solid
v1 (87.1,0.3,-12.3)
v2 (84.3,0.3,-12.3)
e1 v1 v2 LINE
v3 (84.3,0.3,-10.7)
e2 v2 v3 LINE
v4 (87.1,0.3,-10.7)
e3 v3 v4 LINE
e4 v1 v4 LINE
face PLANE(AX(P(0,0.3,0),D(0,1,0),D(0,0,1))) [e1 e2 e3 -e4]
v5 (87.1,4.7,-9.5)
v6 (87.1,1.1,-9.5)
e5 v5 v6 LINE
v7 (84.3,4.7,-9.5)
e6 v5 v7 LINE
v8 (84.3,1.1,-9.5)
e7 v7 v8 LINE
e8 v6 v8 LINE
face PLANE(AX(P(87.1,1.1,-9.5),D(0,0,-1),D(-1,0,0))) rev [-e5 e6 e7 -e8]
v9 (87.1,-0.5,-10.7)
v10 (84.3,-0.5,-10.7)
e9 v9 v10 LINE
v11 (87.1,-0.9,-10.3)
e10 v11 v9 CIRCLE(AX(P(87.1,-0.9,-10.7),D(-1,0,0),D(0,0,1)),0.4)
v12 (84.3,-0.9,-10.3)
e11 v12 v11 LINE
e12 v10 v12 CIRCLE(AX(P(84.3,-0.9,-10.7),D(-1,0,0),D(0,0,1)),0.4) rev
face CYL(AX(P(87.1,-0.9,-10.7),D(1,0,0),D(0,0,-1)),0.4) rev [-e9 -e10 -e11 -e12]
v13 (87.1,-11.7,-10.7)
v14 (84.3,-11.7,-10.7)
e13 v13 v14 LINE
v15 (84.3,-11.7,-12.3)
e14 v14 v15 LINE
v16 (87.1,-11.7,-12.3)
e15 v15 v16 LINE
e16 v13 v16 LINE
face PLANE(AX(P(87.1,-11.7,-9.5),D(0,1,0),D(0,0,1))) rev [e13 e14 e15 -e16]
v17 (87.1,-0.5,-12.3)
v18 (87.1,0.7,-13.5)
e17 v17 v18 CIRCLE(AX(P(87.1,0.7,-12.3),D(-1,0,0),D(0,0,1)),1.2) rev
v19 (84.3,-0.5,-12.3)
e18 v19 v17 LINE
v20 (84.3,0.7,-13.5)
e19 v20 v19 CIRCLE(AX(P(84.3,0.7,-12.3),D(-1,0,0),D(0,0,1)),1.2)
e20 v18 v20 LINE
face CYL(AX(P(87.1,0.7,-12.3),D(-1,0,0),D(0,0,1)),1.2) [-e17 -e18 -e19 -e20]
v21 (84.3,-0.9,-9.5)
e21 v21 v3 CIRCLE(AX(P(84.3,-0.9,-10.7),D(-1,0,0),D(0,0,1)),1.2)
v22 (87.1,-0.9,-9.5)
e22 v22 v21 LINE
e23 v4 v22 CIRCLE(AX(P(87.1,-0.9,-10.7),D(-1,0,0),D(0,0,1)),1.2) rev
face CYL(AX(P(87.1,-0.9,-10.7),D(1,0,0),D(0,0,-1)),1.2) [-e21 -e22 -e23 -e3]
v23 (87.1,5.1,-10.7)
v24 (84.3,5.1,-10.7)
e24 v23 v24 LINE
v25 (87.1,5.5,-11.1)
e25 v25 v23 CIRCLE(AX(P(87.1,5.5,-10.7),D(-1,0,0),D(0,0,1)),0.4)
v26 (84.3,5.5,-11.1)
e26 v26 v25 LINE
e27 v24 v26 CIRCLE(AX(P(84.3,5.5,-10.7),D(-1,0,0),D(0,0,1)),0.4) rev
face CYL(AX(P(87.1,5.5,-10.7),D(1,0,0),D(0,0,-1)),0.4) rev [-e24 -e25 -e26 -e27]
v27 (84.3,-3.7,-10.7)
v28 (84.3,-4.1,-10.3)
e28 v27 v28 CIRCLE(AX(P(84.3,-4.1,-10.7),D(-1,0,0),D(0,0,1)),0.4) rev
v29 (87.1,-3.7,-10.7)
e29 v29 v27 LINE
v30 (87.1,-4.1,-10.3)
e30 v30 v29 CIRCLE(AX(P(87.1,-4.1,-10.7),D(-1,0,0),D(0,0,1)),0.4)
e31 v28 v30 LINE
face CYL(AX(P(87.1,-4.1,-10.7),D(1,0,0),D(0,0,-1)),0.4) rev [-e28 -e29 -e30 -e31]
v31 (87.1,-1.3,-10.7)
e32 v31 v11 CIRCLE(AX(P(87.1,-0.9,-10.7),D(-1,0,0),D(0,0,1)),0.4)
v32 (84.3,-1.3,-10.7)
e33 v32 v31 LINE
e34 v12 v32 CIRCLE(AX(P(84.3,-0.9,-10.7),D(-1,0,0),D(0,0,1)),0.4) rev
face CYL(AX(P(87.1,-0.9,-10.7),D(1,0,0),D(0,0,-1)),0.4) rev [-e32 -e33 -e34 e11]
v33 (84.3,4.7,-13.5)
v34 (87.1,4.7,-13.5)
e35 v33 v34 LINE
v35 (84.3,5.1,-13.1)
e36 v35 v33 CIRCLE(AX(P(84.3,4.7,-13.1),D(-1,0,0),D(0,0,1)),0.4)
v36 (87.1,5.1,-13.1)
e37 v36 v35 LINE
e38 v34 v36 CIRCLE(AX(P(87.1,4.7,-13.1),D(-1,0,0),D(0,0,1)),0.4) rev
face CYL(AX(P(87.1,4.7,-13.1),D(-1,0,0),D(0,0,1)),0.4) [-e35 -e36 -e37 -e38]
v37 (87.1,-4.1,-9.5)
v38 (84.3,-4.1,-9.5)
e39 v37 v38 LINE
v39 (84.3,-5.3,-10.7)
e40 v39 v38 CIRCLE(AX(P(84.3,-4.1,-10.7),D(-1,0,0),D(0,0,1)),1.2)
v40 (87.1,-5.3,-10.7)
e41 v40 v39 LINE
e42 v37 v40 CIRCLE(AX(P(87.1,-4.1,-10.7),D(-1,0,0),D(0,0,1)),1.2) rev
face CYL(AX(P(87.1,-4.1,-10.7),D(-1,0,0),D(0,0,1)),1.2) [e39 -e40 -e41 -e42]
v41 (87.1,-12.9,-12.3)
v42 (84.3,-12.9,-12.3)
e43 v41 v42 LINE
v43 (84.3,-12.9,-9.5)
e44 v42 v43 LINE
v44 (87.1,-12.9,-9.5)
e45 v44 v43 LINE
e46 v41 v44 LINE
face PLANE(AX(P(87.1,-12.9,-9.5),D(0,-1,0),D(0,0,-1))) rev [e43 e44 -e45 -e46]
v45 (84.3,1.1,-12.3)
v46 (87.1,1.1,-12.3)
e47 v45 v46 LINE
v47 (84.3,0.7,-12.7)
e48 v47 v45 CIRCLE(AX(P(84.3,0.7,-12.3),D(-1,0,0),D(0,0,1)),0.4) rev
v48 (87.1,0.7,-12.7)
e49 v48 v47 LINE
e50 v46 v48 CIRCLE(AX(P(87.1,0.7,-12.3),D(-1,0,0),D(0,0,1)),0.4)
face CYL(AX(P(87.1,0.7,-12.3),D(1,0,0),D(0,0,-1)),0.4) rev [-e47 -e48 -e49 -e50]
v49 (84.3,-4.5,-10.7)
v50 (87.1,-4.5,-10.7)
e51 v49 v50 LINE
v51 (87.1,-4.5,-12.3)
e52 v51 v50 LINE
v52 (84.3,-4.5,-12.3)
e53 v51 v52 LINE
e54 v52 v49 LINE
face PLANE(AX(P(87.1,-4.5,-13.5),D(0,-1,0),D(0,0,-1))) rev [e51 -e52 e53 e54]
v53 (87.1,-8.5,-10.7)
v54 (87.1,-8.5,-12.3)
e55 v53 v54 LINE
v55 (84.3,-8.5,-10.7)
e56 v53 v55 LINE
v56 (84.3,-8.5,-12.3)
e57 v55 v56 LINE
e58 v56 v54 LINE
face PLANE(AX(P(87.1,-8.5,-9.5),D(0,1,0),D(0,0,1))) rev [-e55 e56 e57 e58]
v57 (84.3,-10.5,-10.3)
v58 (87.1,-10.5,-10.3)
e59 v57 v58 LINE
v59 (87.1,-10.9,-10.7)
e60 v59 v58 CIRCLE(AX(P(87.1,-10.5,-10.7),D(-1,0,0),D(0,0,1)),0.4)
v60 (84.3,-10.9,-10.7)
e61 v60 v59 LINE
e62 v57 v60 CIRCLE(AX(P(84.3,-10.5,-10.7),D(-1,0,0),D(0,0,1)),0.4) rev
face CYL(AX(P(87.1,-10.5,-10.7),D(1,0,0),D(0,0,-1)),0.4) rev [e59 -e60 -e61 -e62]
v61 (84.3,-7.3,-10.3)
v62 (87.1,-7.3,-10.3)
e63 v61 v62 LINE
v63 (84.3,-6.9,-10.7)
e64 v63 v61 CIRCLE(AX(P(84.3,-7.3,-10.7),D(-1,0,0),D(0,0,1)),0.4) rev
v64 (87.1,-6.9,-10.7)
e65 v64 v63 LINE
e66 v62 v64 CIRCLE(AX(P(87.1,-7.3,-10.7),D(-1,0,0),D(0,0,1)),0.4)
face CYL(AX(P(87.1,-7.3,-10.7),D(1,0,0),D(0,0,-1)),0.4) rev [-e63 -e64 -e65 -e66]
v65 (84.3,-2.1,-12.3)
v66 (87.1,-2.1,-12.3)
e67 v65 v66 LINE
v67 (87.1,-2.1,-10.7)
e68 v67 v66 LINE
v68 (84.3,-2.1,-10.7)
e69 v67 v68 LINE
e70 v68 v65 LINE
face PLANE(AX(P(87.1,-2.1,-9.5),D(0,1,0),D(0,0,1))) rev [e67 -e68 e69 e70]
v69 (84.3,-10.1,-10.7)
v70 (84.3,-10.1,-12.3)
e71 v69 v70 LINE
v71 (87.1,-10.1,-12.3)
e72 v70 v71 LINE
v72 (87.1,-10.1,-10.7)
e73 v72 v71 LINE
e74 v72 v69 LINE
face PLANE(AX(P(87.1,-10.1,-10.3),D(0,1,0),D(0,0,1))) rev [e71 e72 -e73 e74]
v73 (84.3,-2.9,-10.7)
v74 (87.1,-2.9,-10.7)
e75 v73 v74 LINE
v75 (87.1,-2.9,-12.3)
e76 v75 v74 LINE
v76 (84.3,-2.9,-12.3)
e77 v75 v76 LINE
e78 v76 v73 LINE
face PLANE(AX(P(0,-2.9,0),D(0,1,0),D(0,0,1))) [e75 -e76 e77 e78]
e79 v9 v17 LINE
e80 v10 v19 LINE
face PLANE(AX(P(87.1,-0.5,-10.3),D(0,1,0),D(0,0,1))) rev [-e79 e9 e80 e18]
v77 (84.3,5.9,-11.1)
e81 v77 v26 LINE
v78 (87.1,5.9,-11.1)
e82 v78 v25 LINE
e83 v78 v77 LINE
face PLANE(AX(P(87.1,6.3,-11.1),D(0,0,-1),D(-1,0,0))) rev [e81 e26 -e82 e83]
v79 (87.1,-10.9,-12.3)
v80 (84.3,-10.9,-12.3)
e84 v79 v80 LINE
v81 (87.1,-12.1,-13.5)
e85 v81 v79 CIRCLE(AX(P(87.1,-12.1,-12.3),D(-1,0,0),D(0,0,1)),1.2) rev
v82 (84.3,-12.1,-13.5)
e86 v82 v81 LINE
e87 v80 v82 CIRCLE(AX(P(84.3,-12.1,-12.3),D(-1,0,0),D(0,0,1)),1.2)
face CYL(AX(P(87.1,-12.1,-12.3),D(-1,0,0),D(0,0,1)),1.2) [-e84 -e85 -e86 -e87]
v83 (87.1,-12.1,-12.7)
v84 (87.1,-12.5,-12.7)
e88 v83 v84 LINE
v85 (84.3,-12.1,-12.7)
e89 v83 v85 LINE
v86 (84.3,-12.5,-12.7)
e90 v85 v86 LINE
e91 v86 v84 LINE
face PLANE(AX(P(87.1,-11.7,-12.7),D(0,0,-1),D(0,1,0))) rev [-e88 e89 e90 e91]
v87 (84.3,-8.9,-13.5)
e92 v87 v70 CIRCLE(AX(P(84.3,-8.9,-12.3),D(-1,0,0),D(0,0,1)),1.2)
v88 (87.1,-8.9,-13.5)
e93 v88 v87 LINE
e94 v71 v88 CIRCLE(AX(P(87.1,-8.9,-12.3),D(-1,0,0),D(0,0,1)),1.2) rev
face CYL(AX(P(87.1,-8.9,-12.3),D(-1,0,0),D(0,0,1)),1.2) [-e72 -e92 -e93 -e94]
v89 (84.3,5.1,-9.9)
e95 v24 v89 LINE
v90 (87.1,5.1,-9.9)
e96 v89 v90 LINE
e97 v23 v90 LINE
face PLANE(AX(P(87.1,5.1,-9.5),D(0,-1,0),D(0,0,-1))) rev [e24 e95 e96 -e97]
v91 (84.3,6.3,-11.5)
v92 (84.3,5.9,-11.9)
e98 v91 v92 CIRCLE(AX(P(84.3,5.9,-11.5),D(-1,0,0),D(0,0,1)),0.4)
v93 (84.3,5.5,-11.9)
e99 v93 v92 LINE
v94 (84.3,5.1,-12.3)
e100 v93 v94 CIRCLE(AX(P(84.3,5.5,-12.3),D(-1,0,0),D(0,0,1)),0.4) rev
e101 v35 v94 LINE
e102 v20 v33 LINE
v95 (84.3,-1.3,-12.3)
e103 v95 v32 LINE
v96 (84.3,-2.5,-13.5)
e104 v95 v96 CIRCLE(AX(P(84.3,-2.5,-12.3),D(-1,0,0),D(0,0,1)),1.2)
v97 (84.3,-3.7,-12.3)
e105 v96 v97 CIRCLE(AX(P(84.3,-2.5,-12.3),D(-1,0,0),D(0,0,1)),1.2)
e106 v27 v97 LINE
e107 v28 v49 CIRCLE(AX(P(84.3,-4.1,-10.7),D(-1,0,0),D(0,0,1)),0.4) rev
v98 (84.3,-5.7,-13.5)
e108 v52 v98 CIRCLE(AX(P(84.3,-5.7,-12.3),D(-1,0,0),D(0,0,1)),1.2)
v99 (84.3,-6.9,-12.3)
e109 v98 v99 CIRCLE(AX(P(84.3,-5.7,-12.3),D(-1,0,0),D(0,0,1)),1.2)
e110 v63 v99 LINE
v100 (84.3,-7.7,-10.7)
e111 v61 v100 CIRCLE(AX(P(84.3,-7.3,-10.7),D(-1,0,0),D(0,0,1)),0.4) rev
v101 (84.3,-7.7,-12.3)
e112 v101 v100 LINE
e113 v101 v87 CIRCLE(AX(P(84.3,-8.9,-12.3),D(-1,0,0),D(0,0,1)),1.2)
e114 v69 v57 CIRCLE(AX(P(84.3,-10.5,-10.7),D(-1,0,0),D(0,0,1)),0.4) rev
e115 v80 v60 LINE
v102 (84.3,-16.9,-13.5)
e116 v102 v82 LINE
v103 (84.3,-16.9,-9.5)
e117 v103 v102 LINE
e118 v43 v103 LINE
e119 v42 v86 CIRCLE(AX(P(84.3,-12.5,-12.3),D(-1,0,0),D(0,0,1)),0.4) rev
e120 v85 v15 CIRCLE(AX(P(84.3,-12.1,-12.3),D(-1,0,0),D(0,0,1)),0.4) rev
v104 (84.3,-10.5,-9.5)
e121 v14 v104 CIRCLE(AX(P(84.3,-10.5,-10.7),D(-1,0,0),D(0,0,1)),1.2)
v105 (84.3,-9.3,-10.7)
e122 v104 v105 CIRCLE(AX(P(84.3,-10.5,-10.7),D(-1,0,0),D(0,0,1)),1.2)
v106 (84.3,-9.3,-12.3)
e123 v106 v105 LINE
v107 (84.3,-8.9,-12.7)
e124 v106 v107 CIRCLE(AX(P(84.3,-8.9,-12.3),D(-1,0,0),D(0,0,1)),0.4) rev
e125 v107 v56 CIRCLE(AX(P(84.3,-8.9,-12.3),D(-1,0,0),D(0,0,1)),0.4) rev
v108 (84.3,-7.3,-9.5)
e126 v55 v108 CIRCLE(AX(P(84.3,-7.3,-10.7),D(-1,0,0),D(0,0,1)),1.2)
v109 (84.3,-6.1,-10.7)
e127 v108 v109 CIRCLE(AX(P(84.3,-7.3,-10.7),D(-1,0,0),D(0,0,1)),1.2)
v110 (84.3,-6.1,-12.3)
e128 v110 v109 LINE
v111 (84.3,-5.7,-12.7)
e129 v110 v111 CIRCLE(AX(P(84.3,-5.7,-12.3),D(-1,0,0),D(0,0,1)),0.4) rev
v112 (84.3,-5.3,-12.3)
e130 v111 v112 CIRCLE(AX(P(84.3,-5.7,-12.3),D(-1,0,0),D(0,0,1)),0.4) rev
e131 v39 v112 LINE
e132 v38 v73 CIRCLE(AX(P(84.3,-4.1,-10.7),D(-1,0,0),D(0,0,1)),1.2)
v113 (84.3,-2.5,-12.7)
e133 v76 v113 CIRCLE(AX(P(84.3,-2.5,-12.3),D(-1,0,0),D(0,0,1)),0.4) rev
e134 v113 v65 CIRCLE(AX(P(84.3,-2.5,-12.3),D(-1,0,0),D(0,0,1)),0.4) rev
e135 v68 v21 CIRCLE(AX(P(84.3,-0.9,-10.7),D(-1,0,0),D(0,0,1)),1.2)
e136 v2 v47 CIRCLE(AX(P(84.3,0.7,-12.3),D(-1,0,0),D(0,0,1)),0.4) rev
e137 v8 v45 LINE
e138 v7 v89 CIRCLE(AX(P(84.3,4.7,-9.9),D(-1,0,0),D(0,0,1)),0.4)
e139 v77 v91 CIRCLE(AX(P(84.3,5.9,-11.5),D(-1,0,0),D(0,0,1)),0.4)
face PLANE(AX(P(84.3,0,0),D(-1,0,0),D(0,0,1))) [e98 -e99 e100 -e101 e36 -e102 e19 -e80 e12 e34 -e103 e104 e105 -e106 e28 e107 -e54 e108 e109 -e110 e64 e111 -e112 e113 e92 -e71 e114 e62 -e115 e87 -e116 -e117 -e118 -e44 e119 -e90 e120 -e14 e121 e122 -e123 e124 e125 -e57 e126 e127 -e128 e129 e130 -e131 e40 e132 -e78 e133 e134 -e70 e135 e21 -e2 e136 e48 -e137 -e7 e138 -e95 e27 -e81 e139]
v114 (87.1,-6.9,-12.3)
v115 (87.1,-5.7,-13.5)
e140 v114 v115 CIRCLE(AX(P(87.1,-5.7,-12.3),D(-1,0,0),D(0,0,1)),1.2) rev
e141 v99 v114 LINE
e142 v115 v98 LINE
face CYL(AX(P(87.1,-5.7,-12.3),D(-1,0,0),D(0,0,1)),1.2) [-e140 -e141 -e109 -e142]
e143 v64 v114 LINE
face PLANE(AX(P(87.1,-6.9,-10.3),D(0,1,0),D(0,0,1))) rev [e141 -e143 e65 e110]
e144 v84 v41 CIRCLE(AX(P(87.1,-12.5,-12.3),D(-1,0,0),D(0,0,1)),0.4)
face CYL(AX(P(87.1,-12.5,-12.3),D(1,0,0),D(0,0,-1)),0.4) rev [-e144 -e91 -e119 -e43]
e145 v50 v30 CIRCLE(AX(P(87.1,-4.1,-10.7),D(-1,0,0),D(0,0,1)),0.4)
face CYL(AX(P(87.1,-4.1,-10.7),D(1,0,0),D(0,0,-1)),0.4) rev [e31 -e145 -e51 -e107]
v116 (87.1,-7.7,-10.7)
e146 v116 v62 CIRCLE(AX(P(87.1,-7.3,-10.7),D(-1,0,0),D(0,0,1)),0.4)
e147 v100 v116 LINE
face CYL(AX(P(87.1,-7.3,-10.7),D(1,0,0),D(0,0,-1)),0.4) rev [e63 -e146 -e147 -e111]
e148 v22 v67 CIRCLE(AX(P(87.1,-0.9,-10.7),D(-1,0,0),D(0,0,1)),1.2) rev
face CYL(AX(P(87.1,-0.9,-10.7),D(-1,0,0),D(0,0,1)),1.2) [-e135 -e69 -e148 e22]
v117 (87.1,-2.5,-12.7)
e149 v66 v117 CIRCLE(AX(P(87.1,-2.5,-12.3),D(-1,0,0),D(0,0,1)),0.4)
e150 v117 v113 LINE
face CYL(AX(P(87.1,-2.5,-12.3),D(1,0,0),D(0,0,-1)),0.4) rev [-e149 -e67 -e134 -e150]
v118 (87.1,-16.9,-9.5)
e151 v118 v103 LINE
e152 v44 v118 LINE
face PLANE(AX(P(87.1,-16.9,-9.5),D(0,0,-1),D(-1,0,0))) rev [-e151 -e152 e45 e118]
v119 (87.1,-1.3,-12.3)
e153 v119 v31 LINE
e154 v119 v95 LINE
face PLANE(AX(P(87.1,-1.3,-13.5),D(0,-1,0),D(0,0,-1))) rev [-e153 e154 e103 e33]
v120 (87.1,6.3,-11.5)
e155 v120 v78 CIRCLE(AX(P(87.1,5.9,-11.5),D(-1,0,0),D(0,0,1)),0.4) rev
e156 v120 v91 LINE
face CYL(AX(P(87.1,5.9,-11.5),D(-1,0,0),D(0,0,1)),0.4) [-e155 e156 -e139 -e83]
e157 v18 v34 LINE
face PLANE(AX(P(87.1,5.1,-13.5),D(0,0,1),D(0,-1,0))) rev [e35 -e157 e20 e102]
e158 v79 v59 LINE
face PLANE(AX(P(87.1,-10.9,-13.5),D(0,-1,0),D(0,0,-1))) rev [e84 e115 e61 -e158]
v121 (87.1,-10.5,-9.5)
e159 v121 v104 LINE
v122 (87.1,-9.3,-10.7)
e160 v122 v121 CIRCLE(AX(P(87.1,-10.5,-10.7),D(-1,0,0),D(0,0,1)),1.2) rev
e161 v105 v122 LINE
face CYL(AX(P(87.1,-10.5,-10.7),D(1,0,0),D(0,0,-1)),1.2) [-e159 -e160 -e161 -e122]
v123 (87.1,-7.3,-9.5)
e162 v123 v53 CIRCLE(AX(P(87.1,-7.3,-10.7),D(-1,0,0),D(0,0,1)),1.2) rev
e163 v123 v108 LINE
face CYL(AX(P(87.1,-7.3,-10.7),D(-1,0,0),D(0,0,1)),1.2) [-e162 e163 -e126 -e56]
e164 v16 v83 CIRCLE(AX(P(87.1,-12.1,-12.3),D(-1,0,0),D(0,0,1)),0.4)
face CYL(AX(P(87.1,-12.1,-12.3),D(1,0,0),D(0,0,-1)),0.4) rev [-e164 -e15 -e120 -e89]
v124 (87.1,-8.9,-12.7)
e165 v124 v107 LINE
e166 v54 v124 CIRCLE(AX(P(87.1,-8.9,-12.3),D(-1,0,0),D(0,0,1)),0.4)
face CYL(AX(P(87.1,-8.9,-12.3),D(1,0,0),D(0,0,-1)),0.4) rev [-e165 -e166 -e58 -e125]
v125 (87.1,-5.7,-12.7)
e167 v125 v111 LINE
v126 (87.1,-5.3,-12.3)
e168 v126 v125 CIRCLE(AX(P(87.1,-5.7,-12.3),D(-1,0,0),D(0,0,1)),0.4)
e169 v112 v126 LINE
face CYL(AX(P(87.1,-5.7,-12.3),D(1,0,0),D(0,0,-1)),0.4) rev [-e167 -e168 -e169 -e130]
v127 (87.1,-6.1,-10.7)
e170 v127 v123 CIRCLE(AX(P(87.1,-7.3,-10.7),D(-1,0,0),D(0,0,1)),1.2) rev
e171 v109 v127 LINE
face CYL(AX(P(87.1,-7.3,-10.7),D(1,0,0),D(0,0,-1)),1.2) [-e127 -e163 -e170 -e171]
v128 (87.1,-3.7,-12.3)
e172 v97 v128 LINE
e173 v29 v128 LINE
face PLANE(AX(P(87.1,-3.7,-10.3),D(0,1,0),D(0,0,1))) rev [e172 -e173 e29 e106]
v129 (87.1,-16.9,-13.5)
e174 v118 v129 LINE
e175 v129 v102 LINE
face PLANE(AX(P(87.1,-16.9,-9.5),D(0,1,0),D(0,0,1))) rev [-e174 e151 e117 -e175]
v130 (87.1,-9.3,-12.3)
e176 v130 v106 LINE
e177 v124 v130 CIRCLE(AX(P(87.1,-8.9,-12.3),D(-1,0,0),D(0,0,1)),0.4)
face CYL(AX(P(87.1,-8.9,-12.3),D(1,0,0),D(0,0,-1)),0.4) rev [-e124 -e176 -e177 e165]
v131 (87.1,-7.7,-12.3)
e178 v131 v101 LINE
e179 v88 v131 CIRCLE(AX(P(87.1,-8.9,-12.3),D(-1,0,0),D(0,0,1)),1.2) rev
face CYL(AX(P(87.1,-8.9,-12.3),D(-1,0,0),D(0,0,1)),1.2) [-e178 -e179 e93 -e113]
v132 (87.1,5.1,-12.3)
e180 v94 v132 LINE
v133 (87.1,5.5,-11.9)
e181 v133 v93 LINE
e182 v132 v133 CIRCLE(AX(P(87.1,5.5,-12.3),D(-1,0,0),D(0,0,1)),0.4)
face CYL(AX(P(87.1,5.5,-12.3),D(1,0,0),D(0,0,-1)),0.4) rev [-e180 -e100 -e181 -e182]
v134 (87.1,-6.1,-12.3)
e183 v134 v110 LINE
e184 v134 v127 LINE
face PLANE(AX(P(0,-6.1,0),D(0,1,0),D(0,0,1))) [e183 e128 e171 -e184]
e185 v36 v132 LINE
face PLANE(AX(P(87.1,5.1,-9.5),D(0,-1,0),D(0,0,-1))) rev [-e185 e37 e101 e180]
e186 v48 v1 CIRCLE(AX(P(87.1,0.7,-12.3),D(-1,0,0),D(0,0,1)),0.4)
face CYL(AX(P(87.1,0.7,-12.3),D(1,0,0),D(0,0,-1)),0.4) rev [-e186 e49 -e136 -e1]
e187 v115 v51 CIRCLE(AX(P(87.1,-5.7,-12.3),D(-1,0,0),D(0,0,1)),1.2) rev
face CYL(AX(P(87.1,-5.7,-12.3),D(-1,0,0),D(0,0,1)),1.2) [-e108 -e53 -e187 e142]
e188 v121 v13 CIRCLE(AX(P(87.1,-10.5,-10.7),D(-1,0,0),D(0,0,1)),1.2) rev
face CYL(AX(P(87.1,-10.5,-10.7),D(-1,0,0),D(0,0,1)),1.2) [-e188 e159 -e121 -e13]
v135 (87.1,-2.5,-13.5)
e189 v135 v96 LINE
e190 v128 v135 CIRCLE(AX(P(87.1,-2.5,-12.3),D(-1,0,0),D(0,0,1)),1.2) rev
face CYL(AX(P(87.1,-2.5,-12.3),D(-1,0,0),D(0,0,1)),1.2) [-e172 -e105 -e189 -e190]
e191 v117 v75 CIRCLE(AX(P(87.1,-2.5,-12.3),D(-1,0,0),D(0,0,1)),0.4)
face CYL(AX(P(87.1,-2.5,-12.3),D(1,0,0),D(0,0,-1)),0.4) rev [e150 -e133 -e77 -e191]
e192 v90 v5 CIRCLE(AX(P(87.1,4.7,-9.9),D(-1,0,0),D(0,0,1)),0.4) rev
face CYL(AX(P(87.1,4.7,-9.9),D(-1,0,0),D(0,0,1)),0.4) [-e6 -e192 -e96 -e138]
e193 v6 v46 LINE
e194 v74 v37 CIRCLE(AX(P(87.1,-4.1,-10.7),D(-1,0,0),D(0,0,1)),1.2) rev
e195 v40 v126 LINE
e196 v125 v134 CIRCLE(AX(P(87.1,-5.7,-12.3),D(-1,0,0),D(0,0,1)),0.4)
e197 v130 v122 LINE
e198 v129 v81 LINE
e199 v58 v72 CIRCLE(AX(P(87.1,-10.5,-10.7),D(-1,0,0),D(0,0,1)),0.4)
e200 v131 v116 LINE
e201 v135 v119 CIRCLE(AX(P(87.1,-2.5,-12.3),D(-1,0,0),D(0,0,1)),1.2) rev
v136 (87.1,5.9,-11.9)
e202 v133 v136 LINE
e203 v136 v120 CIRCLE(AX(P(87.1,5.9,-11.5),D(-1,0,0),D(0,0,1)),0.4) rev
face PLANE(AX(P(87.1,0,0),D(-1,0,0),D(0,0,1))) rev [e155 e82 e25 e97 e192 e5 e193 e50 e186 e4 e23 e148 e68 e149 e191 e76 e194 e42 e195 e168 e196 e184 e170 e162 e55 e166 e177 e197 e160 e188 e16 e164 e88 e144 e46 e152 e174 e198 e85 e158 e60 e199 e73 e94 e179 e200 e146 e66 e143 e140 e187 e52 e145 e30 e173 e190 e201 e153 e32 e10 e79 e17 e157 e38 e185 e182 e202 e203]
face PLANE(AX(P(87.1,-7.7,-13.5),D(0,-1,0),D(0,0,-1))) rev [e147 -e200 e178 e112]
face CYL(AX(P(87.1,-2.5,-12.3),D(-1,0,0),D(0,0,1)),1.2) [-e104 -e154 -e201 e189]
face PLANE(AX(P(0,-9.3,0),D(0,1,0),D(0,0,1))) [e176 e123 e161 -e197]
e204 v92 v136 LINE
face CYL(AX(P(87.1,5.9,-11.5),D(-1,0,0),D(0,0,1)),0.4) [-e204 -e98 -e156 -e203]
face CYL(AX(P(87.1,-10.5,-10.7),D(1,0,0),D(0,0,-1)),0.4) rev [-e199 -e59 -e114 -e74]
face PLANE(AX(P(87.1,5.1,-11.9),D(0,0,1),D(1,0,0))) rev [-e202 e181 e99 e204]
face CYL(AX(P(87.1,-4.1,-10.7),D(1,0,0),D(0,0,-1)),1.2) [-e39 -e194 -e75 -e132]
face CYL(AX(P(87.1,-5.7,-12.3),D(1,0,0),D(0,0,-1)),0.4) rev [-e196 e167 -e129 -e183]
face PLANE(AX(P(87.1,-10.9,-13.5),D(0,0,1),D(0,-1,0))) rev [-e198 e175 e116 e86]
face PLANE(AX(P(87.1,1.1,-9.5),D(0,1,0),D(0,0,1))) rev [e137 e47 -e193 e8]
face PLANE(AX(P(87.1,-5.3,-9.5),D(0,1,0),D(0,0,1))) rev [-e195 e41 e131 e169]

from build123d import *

# Parameters (mm, degrees)
AUFSATZ_LINEAR_AUSTRAGEN3_DEPTH = 2.8
VERRUNDUNG2_R                   = 0.4
VERRUNDUNG5_R                   = 1.2
VERRUNDUNG6_R                   = 1.2
LINEARES_MUSTER1_COUNT          = 5
LINEARES_MUSTER1_PITCH          = 3.2
SKIZZE5_W                       = 4
SKIZZE5_H                       = 4
AUFSATZ_LINEAR_AUSTRAGEN4_DEPTH = 2.8
VERRUNDUNG3_R                   = 0.4
VERRUNDUNG4_R                   = 0.4
VERRUNDUNG8_R                   = 1.2


# Read off the part's stored shape, not the designer's step: Aufsatz-Linear austragen3
with BuildPart() as part:
    # Aufsatz-Linear austragen3 outline → Aufsatz-Linear austragen3 (new body)
    with BuildSketch(Plane(origin=(84.3, 0, 0), x_dir=(0, 0, -1), z_dir=(1, 0, 0))):
        Polygon((11.9, 5.1), (11.9, 6.3), (11.1, 6.3), (11.1, 4.3), (12.7, 4.3), (12.7, 3.5), (9.5, 3.5), (9.5, 1.1), (12.7, 1.1), (12.7, -0.1), (13.5, -0.1), (13.5, 1.9), (10.3, 1.9), (10.3, 2.7), (13.5, 2.7), (13.5, 5.1), align=None)
    extrude(amount=AUFSATZ_LINEAR_AUSTRAGEN3_DEPTH)

    # Verrundung2
    verrundung2_edges = [part.edges().sort_by_distance(p)[0] for p in [
        (85.7, 1.9, -10.3),
        (85.7, 2.7, -10.3),
        (85.7, 3.5, -12.7),
        (85.7, 4.3, -12.7),
        (85.7, 5.1, -11.9),
        (85.7, 6.3, -11.1),
        (85.7, 6.3, -11.9),
        (85.7, 1.1, -12.7),
    ]]
    fillet(verrundung2_edges, radius=VERRUNDUNG2_R - 0.0001)  # a hair under: the kernel refuses the full size


with BuildPart() as body_2:
    # Abspalten1: the piece on the far side of the plane
    add(part.part)
    split(bisect_by=Plane.ZX.offset(3.5), keep=Keep.BOTTOM)

    # Verrundung5
    verrundung5_edges = [body_2.edges().sort_by_distance(p)[0] for p in [
        (85.7, 1.1, -9.5),
        (85.7, 3.5, -9.5),
    ]]
    fillet(verrundung5_edges, radius=VERRUNDUNG5_R - 0.0001)  # a hair under: the kernel refuses the full size


with BuildPart() as part_1:
    add(part.part)

    # Abspalten1
    split(bisect_by=Plane.ZX.offset(3.5), keep=Keep.TOP)

    # Verrundung6
    verrundung6_edges = [part_1.edges().sort_by_distance(p)[0] for p in [
        (85.7, 5.1, -13.5),
    ]]
    fillet(verrundung6_edges, radius=VERRUNDUNG6_R)


with BuildPart() as lineares_muster1_1:
    # Lineares Muster1: pattern copy
    add(body_2.part.moved(Location(Vector(0, -1, 0) * (1 * LINEARES_MUSTER1_PITCH))))


with BuildPart() as lineares_muster1_2:
    # Lineares Muster1: pattern copy
    add(body_2.part.moved(Location(Vector(0, -1, 0) * (2 * LINEARES_MUSTER1_PITCH))))


with BuildPart() as lineares_muster1_3:
    # Lineares Muster1: pattern copy
    add(body_2.part.moved(Location(Vector(0, -1, 0) * (3 * LINEARES_MUSTER1_PITCH))))


with BuildPart() as lineares_muster1_4:
    # Lineares Muster1: pattern copy
    add(body_2.part.moved(Location(Vector(0, -1, 0) * (4 * LINEARES_MUSTER1_PITCH))))

    # Skizze5 → Aufsatz-Linear austragen4 (add)
    with BuildSketch(Plane(origin=(84.3, 0, 0), x_dir=(0, 0, -1), z_dir=(1, 0, 0))):
        with Locations((11.5, -14.9)):
            Rectangle(SKIZZE5_W, SKIZZE5_H)
        with Locations((11.5, 3.1)):
            Rectangle(SKIZZE5_W, SKIZZE5_H)
    extrude(amount=AUFSATZ_LINEAR_AUSTRAGEN4_DEPTH)


with BuildPart() as aufsatz_linear_austragen4_piece_1:
    # of the separate pieces the step leaves, piece 1, a body of its own (aufsatz_linear_austragen4_pieces)
    add(lineares_muster1_4.part.solids().sort_by_distance((84.3, -9.3, -10.6999))[0])

    # Verrundung3
    verrundung3_edges = [aufsatz_linear_austragen4_piece_1.edges().sort_by_distance(p)[0] for p in [
        (85.7, -12.9, -12.7),
    ]]
    fillet(verrundung3_edges, radius=VERRUNDUNG3_R)


with BuildPart() as aufsatz_linear_austragen4_piece_2:
    # of the separate pieces the step leaves, piece 2, a body of its own (aufsatz_linear_austragen4_pieces)
    add(lineares_muster1_4.part.solids().sort_by_distance((84.3, 1.1, -9.5))[0])


with BuildPart() as part_2:
    add(part_1.part)

    # Kombinieren1: union body 2, Lineares Muster1_1, Lineares Muster1_2, Lineares Muster1_3, Aufsatz-Linear austragen4 piece 1, Aufsatz-Linear austragen4 piece 2
    add(body_2.part)
    add(lineares_muster1_1.part)
    add(lineares_muster1_2.part)
    add(lineares_muster1_3.part)
    add(aufsatz_linear_austragen4_piece_1.part)
    add(aufsatz_linear_austragen4_piece_2.part)

    # Verrundung4
    verrundung4_edges = [part_2.edges().sort_by_distance(p)[0] for p in [
        (85.7, 5.1, -11.1),
        (85.7, 5.1, -13.5),
        (85.7, 0.3, -12.7),
        (85.7, -2.9, -12.7),
        (85.7, -6.1, -12.7),
        (85.7, -9.3, -12.7),
        (85.7, 5.1, -9.5),
    ]]
    fillet(verrundung4_edges, radius=VERRUNDUNG4_R)

    # Verrundung8
    verrundung8_edges = [part_2.edges().sort_by_distance(p)[0] for p in [
        (85.7, -0.5, -13.5),
        (85.7, -3.7, -13.5),
        (85.7, -1.3, -13.5),
        (85.7, -6.9, -13.5),
        (85.7, -4.5, -13.5),
        (85.7, -10.1, -13.5),
        (85.7, -7.7, -13.5),
        (85.7, -10.9, -13.5),
    ]]
    fillet(verrundung8_edges, radius=VERRUNDUNG8_R - 0.0001)  # a hair under: the kernel refuses the full size


solid = part_2.part
